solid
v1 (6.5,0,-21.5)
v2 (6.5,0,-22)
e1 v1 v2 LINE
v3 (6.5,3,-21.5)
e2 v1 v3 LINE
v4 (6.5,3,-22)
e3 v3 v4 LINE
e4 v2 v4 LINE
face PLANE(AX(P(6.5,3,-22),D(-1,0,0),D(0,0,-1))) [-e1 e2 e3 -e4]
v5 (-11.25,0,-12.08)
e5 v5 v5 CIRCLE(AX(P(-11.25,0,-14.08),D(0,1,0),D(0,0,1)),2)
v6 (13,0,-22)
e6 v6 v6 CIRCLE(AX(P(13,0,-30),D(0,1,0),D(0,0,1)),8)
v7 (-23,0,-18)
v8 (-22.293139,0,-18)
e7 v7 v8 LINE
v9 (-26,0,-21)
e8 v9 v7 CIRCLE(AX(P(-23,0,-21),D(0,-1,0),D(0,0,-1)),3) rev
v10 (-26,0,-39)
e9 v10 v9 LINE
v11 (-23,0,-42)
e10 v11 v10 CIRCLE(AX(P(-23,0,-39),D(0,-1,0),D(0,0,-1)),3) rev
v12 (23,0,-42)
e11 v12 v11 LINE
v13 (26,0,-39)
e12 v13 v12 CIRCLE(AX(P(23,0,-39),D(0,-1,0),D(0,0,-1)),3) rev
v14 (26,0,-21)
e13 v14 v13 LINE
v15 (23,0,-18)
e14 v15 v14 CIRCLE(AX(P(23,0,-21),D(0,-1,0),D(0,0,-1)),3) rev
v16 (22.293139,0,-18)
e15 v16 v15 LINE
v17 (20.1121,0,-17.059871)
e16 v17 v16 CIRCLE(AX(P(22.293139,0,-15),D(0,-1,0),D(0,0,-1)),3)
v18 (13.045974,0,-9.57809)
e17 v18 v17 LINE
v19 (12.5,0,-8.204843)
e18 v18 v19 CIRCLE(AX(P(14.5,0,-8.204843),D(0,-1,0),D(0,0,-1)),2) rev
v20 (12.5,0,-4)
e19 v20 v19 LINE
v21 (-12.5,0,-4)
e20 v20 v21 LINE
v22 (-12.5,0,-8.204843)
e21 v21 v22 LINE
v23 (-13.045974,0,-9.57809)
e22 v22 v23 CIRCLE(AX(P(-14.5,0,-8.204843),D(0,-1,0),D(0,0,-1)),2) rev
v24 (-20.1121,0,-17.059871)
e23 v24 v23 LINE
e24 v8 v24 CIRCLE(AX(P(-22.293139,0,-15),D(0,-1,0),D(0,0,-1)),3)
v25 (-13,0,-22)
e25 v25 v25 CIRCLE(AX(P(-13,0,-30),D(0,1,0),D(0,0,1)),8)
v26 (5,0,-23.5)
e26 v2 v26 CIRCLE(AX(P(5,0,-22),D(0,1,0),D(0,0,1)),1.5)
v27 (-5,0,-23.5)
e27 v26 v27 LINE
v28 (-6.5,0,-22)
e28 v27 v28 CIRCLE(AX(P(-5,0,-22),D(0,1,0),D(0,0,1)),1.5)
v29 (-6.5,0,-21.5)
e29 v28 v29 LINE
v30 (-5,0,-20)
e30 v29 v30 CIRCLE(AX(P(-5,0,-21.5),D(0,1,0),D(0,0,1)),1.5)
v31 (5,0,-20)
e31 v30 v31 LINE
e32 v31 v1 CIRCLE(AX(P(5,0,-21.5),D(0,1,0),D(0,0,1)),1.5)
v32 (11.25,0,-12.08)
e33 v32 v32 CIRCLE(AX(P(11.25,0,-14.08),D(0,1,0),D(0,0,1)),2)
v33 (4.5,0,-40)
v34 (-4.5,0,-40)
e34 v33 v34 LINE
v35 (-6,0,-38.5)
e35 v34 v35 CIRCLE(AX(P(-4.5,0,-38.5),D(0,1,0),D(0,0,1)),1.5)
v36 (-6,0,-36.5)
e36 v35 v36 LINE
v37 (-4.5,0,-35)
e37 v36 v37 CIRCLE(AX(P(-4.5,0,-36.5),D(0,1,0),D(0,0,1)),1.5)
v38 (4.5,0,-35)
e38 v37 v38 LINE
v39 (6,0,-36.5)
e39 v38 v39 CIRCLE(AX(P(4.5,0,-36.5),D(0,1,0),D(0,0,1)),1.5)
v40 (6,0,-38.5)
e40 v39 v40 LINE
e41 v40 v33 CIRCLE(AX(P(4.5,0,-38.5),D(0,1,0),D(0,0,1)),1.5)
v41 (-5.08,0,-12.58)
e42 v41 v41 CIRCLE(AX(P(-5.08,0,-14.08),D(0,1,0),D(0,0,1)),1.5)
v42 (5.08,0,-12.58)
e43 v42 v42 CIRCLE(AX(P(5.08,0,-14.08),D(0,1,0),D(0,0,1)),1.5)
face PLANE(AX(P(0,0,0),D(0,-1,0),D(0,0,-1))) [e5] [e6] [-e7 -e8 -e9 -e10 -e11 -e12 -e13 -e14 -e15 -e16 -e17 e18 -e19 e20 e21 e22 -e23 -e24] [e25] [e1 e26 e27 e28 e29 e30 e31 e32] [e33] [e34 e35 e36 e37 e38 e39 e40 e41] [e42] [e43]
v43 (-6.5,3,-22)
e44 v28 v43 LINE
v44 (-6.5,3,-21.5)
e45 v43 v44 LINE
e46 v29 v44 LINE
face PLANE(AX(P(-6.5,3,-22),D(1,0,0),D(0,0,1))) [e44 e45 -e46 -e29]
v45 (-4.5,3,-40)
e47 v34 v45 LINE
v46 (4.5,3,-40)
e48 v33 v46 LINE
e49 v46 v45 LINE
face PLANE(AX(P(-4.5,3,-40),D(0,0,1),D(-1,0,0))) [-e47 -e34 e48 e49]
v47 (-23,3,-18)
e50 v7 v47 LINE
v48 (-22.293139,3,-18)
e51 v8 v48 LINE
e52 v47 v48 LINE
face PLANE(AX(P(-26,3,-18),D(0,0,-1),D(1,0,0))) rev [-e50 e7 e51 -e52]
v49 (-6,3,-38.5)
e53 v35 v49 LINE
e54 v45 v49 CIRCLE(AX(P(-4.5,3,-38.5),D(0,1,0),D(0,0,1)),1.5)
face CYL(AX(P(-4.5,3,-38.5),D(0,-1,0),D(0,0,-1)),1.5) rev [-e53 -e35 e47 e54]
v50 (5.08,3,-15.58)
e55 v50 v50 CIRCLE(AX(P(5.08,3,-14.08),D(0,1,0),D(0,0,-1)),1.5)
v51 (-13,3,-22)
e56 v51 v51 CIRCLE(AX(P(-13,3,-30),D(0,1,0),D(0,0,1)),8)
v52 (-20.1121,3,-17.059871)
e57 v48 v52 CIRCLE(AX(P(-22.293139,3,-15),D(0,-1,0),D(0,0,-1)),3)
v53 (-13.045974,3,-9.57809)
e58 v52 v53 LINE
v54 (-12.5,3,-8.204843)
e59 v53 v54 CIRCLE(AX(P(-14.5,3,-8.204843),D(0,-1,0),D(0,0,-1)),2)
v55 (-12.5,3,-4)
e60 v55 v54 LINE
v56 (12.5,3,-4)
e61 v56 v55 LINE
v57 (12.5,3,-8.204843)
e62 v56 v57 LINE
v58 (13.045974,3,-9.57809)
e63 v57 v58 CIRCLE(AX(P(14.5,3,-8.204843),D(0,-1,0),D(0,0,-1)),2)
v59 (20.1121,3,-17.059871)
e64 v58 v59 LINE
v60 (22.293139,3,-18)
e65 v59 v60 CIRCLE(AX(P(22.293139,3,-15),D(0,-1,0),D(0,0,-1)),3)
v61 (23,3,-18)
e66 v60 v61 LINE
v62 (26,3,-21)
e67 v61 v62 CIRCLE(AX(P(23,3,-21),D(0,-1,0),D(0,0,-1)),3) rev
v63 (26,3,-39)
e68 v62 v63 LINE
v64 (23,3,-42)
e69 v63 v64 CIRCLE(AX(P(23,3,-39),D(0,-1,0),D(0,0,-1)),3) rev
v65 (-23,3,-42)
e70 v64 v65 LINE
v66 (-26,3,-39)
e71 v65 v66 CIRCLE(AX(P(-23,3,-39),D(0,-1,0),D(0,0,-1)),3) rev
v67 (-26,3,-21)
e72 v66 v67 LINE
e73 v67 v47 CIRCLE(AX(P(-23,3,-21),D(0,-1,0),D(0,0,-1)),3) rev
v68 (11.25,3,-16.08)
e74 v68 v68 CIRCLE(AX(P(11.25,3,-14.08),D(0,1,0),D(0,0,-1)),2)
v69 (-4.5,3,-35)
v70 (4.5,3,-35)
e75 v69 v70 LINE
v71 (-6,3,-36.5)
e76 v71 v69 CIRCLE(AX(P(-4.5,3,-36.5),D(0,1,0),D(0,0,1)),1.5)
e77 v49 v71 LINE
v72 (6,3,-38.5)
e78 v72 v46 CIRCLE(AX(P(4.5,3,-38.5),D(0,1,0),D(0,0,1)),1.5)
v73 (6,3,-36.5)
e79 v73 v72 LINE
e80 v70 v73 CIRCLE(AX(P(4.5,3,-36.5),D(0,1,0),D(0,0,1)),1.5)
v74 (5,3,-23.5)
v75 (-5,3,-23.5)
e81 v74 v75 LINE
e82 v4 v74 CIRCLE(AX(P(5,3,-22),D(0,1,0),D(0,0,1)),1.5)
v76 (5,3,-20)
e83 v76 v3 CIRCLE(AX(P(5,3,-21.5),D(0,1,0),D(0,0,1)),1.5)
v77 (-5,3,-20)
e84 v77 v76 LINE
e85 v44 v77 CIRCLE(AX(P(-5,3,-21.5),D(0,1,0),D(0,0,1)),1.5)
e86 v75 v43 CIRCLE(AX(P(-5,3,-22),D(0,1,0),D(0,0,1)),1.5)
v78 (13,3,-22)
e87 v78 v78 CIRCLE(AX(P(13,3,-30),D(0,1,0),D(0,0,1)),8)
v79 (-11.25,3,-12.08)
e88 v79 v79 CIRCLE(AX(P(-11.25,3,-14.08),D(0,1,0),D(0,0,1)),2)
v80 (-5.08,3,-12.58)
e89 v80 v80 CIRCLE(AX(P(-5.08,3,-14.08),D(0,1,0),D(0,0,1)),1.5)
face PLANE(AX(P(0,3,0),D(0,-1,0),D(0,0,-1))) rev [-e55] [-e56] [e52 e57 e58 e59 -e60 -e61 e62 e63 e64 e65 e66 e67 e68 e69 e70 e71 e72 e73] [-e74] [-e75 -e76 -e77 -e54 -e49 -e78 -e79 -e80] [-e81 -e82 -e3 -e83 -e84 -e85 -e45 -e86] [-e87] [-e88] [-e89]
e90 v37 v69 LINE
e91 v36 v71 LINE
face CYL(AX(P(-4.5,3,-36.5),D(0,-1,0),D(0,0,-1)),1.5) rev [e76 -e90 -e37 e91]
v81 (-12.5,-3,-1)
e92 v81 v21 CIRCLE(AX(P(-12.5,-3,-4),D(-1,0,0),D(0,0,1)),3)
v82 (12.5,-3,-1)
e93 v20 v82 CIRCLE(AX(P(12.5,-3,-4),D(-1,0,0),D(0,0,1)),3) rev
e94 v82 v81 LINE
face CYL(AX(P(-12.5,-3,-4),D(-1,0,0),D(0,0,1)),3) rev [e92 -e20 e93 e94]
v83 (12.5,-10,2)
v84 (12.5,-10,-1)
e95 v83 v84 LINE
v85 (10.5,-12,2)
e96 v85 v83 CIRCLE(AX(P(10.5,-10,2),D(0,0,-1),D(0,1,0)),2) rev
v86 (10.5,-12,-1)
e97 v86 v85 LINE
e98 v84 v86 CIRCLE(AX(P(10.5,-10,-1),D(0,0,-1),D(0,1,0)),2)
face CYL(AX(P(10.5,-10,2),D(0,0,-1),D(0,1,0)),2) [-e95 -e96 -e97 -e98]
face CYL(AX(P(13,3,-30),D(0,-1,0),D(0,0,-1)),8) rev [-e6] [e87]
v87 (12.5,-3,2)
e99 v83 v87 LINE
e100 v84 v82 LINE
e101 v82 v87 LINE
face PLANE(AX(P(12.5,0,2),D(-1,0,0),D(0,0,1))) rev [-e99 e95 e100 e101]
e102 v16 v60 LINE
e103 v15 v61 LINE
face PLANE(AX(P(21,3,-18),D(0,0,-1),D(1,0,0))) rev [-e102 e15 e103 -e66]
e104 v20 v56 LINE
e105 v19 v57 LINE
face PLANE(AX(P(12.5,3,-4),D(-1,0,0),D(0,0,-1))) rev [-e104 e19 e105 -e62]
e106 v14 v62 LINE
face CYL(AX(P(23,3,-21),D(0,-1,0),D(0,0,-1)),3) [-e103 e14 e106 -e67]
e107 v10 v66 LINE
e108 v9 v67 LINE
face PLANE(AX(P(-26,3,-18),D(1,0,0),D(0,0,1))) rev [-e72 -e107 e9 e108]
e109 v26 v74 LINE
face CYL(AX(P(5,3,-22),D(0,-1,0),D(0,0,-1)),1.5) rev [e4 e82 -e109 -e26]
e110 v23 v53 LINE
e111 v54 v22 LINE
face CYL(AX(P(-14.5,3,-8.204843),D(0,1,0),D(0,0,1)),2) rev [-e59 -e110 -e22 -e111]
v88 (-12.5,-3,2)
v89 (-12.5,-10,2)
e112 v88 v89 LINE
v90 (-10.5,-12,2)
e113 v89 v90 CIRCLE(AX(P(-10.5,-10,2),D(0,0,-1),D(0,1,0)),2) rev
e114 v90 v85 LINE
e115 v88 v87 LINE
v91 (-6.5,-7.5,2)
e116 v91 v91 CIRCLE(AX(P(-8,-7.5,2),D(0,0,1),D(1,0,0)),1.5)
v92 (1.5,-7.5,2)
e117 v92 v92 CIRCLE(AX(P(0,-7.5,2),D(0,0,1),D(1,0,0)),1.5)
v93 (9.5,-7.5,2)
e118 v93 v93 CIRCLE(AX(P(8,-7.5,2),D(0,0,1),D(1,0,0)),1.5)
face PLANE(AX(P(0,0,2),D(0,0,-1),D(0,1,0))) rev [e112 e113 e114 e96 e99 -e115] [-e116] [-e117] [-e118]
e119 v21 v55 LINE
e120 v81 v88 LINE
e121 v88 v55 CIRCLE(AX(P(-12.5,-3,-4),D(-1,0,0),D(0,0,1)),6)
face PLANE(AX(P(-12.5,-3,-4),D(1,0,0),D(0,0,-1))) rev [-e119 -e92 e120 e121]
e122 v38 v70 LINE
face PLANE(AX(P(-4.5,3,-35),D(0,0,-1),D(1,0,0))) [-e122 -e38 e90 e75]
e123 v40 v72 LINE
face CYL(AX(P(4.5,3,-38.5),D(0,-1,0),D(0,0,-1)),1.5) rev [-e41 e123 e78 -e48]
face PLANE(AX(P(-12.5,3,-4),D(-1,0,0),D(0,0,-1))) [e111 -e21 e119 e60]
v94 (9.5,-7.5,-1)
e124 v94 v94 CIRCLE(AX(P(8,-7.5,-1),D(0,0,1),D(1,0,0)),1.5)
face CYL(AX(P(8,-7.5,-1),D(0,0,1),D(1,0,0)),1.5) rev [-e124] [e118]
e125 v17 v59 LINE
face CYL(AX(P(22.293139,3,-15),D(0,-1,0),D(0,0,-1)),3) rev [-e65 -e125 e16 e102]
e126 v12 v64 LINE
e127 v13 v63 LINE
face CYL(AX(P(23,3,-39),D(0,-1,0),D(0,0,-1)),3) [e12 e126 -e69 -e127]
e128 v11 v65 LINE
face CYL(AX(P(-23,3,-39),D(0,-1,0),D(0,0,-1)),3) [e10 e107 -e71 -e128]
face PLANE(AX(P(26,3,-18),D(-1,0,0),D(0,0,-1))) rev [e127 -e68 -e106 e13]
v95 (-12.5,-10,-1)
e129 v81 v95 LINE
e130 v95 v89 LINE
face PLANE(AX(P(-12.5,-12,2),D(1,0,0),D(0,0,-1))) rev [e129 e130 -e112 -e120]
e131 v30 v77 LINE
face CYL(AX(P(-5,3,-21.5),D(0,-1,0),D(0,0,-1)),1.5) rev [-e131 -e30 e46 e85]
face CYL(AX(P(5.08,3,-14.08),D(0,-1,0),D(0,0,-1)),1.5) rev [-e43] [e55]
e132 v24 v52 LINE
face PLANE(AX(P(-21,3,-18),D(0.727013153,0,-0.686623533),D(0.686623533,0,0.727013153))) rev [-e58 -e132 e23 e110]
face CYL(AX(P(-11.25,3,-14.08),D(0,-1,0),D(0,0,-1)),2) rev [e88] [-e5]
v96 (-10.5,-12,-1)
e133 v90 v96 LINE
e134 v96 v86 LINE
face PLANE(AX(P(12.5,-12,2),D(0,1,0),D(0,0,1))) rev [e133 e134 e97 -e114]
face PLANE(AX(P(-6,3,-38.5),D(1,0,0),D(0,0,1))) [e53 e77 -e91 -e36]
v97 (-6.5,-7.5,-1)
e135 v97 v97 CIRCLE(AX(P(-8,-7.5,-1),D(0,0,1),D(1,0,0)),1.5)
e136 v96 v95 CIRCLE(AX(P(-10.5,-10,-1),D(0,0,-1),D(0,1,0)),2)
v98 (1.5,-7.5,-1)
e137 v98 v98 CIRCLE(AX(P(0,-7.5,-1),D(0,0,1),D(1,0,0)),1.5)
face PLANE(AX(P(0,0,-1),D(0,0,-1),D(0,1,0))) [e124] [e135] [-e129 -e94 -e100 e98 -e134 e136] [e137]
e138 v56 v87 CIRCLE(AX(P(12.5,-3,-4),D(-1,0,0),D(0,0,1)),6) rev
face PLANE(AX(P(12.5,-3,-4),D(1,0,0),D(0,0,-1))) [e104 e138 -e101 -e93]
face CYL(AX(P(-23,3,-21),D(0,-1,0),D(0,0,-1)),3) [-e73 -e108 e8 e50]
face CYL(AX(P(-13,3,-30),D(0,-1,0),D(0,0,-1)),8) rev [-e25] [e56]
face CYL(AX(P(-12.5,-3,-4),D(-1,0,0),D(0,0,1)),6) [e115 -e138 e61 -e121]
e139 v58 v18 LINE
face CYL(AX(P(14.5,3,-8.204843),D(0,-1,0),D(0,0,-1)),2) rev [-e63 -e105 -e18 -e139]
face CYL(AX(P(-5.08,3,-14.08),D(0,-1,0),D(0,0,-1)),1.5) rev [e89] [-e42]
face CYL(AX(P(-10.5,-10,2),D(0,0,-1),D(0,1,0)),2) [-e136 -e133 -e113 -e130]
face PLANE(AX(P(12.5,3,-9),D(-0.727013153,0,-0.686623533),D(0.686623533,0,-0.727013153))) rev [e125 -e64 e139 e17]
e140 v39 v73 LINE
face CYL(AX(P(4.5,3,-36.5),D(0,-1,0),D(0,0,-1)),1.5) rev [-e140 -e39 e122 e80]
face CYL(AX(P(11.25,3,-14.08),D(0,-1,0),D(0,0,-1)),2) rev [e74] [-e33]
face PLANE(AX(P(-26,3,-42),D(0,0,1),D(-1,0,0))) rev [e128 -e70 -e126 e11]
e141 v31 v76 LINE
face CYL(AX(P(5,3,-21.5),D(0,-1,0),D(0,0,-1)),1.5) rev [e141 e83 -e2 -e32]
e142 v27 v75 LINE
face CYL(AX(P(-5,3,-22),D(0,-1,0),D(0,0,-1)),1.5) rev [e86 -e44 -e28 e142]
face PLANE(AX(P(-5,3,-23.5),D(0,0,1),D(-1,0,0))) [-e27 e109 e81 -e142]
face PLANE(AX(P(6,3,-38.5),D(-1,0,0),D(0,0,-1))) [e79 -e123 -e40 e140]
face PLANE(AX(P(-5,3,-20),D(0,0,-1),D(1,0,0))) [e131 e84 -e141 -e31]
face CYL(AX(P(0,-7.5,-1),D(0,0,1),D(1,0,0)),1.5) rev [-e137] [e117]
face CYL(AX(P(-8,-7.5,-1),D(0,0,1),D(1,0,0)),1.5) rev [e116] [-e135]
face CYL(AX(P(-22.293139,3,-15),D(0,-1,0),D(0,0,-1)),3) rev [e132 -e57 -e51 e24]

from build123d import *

# Parameters (mm, degrees)
CROQUIS11_R             = 2
CROQUIS11_R_2           = 1.5
CROQUIS11_R_3           = 9
SALIENTE_EXTRUIR1_DEPTH = 3
REDONDEO1_R             = 3
BOSS_EXTRUDE1_START     = -3
SKETCH1_R               = 9
SKETCH1_R_2             = 8
BOSS_EXTRUDE1_DEPTH     = 3
SKETCH2_W               = 25
SKETCH2_H               = 3
BOSS_EXTRUDE2_DEPTH     = 5
EDGE_FLANGE1_DEPTH      = 25
SKETCH10_R              = 1.5
CUT_EXTRUDE1_DEPTH      = 3
FILLET1_R               = 2


# Sheet-metal steps are written as plain solids
with BuildPart() as part:
    # Croquis11 → Saliente-Extruir1 (new body)
    with BuildSketch(Plane(origin=(0, 0, 0), x_dir=(1, 0, 0), z_dir=(0, 1, 0))):
        Polygon((-26, 18), (-21, 18), (-12.5, 9), (12.5, 9), (21, 18), (26, 18), (26, 42), (-26, 42), align=None)
        with Locations(Location((-11.25, 14.08, 0), (0, 0, 270))):
            Circle(CROQUIS11_R, mode=Mode.SUBTRACT)
        with Locations(Location((-5.08, 14.08, 0), (0, 0, 270))):
            Circle(CROQUIS11_R_2, mode=Mode.SUBTRACT)
        with Locations(Location((5.08, 14.08, 0), (0, 0, 90))):
            Circle(CROQUIS11_R_2, mode=Mode.SUBTRACT)
        with Locations(Location((11.25, 14.08, 0), (0, 0, 90))):
            Circle(CROQUIS11_R, mode=Mode.SUBTRACT)
        with Locations(Location((13, 30, 0), (0, 0, 270))):
            Circle(CROQUIS11_R_3, mode=Mode.SUBTRACT)
        with Locations(Location((-13, 30, 0), (0, 0, 270))):
            Circle(CROQUIS11_R_3, mode=Mode.SUBTRACT)
        with BuildLine():
            Line((-6, 38.5), (-6, 36.5))
            ThreePointArc((-6, 36.5), (-5.560660172, 35.439339828), (-4.5, 35))
            Line((-4.5, 35), (4.5, 35))
            ThreePointArc((4.5, 35), (5.560660172, 35.439339828), (6, 36.5))
            Line((6, 36.5), (6, 38.5))
            ThreePointArc((6, 38.5), (5.560660172, 39.560660172), (4.5, 40))
            Line((4.5, 40), (-4.5, 40))
            ThreePointArc((-4.5, 40), (-5.560660172, 39.560660172), (-6, 38.5))
        make_face(mode=Mode.SUBTRACT)
        with BuildLine():
            Line((6.5, 22), (6.5, 21.5))
            ThreePointArc((6.5, 21.5), (6.060660172, 20.439339828), (5, 20))
            Line((5, 20), (-5, 20))
            ThreePointArc((-5, 20), (-6.060660172, 20.439339828), (-6.5, 21.5))
            Line((-6.5, 21.5), (-6.5, 22))
            ThreePointArc((-6.5, 22), (-6.060660172, 23.060660172), (-5, 23.5))
            Line((-5, 23.5), (5, 23.5))
            ThreePointArc((5, 23.5), (6.060660172, 23.060660172), (6.5, 22))
        make_face(mode=Mode.SUBTRACT)
    extrude(amount=SALIENTE_EXTRUIR1_DEPTH)

    # Redondeo1
    redondeo1_edges = [part.edges().sort_by_distance(p)[0] for p in [
        (26, 1.5, -18),
        (21, 1.5, -18),
        (-21, 1.5, -18),
        (-26, 1.5, -18),
        (-26, 1.5, -42),
        (26, 1.5, -42),
    ]]
    fillet(redondeo1_edges, radius=REDONDEO1_R)

    # Sketch1 → Boss-Extrude1 (add)
    # profile 1 of 2: a face of its own
    with BuildSketch(Plane(origin=(0, 3, 0), x_dir=(1, 0, 0), z_dir=(0, 1, 0)).offset(BOSS_EXTRUDE1_START)):
        with Locations((-13, 30)):
            Circle(SKETCH1_R)
        with Locations(Location((-13, 30, 0), (0, 0, 270))):
            Circle(SKETCH1_R_2, mode=Mode.SUBTRACT)
    # profile 2 of 2: a face of its own
    with BuildSketch(Plane(origin=(0, 3, 0), x_dir=(1, 0, 0), z_dir=(0, 1, 0)).offset(BOSS_EXTRUDE1_START)):
        with Locations((13, 30)):
            Circle(SKETCH1_R)
        with Locations(Location((13, 30, 0), (0, 0, 270))):
            Circle(SKETCH1_R_2, mode=Mode.SUBTRACT)
    extrude(amount=BOSS_EXTRUDE1_DEPTH)

    # Sketch2 → Boss-Extrude2 (add)
    with BuildSketch(Plane.XY.offset(-9)):
        with Locations((0, 1.5)):
            Rectangle(SKETCH2_W, SKETCH2_H)
    extrude(amount=BOSS_EXTRUDE2_DEPTH)

    # Edge-Flange1 section (across the edge) → Edge-Flange1 (add)
    with BuildSketch(Plane(origin=(12.5, 0, -1), x_dir=(0, 0, -1), z_dir=(-1, 0, 0))):
        with BuildLine():
            Line((-3, 3), (-3, 12))
            Line((-3, 12), (0, 12))
            Line((0, 12), (0, 3))
            ThreePointArc((0, 3), (0.878679656, 0.878679656), (3, 0))
            Line((3, 0), (3, -3))
            ThreePointArc((3, -3), (-1.242640687, -1.242640687), (-3, 3))
        make_face()
    extrude(amount=EDGE_FLANGE1_DEPTH)

    # Sketch10 → Cut-Extrude1 (cut)
    with BuildSketch(Plane.XY.offset(2)):
        with Locations((0, -7.5)):
            Circle(SKETCH10_R)
        with Locations((-8, -7.5)):
            Circle(SKETCH10_R)
        with Locations((8, -7.5)):
            Circle(SKETCH10_R)
    extrude(amount=-CUT_EXTRUDE1_DEPTH, mode=Mode.SUBTRACT)

    # Fillet1
    fillet1_edges = [part.edges().sort_by_distance(p)[0] for p in [
        (12.5, 1.5, -9),
        (-12.5, 1.5, -9),
        (12.5, -12, 0.5),
        (-12.5, -12, 0.5),
    ]]
    fillet(fillet1_edges, radius=FILLET1_R)


solid = part.part
